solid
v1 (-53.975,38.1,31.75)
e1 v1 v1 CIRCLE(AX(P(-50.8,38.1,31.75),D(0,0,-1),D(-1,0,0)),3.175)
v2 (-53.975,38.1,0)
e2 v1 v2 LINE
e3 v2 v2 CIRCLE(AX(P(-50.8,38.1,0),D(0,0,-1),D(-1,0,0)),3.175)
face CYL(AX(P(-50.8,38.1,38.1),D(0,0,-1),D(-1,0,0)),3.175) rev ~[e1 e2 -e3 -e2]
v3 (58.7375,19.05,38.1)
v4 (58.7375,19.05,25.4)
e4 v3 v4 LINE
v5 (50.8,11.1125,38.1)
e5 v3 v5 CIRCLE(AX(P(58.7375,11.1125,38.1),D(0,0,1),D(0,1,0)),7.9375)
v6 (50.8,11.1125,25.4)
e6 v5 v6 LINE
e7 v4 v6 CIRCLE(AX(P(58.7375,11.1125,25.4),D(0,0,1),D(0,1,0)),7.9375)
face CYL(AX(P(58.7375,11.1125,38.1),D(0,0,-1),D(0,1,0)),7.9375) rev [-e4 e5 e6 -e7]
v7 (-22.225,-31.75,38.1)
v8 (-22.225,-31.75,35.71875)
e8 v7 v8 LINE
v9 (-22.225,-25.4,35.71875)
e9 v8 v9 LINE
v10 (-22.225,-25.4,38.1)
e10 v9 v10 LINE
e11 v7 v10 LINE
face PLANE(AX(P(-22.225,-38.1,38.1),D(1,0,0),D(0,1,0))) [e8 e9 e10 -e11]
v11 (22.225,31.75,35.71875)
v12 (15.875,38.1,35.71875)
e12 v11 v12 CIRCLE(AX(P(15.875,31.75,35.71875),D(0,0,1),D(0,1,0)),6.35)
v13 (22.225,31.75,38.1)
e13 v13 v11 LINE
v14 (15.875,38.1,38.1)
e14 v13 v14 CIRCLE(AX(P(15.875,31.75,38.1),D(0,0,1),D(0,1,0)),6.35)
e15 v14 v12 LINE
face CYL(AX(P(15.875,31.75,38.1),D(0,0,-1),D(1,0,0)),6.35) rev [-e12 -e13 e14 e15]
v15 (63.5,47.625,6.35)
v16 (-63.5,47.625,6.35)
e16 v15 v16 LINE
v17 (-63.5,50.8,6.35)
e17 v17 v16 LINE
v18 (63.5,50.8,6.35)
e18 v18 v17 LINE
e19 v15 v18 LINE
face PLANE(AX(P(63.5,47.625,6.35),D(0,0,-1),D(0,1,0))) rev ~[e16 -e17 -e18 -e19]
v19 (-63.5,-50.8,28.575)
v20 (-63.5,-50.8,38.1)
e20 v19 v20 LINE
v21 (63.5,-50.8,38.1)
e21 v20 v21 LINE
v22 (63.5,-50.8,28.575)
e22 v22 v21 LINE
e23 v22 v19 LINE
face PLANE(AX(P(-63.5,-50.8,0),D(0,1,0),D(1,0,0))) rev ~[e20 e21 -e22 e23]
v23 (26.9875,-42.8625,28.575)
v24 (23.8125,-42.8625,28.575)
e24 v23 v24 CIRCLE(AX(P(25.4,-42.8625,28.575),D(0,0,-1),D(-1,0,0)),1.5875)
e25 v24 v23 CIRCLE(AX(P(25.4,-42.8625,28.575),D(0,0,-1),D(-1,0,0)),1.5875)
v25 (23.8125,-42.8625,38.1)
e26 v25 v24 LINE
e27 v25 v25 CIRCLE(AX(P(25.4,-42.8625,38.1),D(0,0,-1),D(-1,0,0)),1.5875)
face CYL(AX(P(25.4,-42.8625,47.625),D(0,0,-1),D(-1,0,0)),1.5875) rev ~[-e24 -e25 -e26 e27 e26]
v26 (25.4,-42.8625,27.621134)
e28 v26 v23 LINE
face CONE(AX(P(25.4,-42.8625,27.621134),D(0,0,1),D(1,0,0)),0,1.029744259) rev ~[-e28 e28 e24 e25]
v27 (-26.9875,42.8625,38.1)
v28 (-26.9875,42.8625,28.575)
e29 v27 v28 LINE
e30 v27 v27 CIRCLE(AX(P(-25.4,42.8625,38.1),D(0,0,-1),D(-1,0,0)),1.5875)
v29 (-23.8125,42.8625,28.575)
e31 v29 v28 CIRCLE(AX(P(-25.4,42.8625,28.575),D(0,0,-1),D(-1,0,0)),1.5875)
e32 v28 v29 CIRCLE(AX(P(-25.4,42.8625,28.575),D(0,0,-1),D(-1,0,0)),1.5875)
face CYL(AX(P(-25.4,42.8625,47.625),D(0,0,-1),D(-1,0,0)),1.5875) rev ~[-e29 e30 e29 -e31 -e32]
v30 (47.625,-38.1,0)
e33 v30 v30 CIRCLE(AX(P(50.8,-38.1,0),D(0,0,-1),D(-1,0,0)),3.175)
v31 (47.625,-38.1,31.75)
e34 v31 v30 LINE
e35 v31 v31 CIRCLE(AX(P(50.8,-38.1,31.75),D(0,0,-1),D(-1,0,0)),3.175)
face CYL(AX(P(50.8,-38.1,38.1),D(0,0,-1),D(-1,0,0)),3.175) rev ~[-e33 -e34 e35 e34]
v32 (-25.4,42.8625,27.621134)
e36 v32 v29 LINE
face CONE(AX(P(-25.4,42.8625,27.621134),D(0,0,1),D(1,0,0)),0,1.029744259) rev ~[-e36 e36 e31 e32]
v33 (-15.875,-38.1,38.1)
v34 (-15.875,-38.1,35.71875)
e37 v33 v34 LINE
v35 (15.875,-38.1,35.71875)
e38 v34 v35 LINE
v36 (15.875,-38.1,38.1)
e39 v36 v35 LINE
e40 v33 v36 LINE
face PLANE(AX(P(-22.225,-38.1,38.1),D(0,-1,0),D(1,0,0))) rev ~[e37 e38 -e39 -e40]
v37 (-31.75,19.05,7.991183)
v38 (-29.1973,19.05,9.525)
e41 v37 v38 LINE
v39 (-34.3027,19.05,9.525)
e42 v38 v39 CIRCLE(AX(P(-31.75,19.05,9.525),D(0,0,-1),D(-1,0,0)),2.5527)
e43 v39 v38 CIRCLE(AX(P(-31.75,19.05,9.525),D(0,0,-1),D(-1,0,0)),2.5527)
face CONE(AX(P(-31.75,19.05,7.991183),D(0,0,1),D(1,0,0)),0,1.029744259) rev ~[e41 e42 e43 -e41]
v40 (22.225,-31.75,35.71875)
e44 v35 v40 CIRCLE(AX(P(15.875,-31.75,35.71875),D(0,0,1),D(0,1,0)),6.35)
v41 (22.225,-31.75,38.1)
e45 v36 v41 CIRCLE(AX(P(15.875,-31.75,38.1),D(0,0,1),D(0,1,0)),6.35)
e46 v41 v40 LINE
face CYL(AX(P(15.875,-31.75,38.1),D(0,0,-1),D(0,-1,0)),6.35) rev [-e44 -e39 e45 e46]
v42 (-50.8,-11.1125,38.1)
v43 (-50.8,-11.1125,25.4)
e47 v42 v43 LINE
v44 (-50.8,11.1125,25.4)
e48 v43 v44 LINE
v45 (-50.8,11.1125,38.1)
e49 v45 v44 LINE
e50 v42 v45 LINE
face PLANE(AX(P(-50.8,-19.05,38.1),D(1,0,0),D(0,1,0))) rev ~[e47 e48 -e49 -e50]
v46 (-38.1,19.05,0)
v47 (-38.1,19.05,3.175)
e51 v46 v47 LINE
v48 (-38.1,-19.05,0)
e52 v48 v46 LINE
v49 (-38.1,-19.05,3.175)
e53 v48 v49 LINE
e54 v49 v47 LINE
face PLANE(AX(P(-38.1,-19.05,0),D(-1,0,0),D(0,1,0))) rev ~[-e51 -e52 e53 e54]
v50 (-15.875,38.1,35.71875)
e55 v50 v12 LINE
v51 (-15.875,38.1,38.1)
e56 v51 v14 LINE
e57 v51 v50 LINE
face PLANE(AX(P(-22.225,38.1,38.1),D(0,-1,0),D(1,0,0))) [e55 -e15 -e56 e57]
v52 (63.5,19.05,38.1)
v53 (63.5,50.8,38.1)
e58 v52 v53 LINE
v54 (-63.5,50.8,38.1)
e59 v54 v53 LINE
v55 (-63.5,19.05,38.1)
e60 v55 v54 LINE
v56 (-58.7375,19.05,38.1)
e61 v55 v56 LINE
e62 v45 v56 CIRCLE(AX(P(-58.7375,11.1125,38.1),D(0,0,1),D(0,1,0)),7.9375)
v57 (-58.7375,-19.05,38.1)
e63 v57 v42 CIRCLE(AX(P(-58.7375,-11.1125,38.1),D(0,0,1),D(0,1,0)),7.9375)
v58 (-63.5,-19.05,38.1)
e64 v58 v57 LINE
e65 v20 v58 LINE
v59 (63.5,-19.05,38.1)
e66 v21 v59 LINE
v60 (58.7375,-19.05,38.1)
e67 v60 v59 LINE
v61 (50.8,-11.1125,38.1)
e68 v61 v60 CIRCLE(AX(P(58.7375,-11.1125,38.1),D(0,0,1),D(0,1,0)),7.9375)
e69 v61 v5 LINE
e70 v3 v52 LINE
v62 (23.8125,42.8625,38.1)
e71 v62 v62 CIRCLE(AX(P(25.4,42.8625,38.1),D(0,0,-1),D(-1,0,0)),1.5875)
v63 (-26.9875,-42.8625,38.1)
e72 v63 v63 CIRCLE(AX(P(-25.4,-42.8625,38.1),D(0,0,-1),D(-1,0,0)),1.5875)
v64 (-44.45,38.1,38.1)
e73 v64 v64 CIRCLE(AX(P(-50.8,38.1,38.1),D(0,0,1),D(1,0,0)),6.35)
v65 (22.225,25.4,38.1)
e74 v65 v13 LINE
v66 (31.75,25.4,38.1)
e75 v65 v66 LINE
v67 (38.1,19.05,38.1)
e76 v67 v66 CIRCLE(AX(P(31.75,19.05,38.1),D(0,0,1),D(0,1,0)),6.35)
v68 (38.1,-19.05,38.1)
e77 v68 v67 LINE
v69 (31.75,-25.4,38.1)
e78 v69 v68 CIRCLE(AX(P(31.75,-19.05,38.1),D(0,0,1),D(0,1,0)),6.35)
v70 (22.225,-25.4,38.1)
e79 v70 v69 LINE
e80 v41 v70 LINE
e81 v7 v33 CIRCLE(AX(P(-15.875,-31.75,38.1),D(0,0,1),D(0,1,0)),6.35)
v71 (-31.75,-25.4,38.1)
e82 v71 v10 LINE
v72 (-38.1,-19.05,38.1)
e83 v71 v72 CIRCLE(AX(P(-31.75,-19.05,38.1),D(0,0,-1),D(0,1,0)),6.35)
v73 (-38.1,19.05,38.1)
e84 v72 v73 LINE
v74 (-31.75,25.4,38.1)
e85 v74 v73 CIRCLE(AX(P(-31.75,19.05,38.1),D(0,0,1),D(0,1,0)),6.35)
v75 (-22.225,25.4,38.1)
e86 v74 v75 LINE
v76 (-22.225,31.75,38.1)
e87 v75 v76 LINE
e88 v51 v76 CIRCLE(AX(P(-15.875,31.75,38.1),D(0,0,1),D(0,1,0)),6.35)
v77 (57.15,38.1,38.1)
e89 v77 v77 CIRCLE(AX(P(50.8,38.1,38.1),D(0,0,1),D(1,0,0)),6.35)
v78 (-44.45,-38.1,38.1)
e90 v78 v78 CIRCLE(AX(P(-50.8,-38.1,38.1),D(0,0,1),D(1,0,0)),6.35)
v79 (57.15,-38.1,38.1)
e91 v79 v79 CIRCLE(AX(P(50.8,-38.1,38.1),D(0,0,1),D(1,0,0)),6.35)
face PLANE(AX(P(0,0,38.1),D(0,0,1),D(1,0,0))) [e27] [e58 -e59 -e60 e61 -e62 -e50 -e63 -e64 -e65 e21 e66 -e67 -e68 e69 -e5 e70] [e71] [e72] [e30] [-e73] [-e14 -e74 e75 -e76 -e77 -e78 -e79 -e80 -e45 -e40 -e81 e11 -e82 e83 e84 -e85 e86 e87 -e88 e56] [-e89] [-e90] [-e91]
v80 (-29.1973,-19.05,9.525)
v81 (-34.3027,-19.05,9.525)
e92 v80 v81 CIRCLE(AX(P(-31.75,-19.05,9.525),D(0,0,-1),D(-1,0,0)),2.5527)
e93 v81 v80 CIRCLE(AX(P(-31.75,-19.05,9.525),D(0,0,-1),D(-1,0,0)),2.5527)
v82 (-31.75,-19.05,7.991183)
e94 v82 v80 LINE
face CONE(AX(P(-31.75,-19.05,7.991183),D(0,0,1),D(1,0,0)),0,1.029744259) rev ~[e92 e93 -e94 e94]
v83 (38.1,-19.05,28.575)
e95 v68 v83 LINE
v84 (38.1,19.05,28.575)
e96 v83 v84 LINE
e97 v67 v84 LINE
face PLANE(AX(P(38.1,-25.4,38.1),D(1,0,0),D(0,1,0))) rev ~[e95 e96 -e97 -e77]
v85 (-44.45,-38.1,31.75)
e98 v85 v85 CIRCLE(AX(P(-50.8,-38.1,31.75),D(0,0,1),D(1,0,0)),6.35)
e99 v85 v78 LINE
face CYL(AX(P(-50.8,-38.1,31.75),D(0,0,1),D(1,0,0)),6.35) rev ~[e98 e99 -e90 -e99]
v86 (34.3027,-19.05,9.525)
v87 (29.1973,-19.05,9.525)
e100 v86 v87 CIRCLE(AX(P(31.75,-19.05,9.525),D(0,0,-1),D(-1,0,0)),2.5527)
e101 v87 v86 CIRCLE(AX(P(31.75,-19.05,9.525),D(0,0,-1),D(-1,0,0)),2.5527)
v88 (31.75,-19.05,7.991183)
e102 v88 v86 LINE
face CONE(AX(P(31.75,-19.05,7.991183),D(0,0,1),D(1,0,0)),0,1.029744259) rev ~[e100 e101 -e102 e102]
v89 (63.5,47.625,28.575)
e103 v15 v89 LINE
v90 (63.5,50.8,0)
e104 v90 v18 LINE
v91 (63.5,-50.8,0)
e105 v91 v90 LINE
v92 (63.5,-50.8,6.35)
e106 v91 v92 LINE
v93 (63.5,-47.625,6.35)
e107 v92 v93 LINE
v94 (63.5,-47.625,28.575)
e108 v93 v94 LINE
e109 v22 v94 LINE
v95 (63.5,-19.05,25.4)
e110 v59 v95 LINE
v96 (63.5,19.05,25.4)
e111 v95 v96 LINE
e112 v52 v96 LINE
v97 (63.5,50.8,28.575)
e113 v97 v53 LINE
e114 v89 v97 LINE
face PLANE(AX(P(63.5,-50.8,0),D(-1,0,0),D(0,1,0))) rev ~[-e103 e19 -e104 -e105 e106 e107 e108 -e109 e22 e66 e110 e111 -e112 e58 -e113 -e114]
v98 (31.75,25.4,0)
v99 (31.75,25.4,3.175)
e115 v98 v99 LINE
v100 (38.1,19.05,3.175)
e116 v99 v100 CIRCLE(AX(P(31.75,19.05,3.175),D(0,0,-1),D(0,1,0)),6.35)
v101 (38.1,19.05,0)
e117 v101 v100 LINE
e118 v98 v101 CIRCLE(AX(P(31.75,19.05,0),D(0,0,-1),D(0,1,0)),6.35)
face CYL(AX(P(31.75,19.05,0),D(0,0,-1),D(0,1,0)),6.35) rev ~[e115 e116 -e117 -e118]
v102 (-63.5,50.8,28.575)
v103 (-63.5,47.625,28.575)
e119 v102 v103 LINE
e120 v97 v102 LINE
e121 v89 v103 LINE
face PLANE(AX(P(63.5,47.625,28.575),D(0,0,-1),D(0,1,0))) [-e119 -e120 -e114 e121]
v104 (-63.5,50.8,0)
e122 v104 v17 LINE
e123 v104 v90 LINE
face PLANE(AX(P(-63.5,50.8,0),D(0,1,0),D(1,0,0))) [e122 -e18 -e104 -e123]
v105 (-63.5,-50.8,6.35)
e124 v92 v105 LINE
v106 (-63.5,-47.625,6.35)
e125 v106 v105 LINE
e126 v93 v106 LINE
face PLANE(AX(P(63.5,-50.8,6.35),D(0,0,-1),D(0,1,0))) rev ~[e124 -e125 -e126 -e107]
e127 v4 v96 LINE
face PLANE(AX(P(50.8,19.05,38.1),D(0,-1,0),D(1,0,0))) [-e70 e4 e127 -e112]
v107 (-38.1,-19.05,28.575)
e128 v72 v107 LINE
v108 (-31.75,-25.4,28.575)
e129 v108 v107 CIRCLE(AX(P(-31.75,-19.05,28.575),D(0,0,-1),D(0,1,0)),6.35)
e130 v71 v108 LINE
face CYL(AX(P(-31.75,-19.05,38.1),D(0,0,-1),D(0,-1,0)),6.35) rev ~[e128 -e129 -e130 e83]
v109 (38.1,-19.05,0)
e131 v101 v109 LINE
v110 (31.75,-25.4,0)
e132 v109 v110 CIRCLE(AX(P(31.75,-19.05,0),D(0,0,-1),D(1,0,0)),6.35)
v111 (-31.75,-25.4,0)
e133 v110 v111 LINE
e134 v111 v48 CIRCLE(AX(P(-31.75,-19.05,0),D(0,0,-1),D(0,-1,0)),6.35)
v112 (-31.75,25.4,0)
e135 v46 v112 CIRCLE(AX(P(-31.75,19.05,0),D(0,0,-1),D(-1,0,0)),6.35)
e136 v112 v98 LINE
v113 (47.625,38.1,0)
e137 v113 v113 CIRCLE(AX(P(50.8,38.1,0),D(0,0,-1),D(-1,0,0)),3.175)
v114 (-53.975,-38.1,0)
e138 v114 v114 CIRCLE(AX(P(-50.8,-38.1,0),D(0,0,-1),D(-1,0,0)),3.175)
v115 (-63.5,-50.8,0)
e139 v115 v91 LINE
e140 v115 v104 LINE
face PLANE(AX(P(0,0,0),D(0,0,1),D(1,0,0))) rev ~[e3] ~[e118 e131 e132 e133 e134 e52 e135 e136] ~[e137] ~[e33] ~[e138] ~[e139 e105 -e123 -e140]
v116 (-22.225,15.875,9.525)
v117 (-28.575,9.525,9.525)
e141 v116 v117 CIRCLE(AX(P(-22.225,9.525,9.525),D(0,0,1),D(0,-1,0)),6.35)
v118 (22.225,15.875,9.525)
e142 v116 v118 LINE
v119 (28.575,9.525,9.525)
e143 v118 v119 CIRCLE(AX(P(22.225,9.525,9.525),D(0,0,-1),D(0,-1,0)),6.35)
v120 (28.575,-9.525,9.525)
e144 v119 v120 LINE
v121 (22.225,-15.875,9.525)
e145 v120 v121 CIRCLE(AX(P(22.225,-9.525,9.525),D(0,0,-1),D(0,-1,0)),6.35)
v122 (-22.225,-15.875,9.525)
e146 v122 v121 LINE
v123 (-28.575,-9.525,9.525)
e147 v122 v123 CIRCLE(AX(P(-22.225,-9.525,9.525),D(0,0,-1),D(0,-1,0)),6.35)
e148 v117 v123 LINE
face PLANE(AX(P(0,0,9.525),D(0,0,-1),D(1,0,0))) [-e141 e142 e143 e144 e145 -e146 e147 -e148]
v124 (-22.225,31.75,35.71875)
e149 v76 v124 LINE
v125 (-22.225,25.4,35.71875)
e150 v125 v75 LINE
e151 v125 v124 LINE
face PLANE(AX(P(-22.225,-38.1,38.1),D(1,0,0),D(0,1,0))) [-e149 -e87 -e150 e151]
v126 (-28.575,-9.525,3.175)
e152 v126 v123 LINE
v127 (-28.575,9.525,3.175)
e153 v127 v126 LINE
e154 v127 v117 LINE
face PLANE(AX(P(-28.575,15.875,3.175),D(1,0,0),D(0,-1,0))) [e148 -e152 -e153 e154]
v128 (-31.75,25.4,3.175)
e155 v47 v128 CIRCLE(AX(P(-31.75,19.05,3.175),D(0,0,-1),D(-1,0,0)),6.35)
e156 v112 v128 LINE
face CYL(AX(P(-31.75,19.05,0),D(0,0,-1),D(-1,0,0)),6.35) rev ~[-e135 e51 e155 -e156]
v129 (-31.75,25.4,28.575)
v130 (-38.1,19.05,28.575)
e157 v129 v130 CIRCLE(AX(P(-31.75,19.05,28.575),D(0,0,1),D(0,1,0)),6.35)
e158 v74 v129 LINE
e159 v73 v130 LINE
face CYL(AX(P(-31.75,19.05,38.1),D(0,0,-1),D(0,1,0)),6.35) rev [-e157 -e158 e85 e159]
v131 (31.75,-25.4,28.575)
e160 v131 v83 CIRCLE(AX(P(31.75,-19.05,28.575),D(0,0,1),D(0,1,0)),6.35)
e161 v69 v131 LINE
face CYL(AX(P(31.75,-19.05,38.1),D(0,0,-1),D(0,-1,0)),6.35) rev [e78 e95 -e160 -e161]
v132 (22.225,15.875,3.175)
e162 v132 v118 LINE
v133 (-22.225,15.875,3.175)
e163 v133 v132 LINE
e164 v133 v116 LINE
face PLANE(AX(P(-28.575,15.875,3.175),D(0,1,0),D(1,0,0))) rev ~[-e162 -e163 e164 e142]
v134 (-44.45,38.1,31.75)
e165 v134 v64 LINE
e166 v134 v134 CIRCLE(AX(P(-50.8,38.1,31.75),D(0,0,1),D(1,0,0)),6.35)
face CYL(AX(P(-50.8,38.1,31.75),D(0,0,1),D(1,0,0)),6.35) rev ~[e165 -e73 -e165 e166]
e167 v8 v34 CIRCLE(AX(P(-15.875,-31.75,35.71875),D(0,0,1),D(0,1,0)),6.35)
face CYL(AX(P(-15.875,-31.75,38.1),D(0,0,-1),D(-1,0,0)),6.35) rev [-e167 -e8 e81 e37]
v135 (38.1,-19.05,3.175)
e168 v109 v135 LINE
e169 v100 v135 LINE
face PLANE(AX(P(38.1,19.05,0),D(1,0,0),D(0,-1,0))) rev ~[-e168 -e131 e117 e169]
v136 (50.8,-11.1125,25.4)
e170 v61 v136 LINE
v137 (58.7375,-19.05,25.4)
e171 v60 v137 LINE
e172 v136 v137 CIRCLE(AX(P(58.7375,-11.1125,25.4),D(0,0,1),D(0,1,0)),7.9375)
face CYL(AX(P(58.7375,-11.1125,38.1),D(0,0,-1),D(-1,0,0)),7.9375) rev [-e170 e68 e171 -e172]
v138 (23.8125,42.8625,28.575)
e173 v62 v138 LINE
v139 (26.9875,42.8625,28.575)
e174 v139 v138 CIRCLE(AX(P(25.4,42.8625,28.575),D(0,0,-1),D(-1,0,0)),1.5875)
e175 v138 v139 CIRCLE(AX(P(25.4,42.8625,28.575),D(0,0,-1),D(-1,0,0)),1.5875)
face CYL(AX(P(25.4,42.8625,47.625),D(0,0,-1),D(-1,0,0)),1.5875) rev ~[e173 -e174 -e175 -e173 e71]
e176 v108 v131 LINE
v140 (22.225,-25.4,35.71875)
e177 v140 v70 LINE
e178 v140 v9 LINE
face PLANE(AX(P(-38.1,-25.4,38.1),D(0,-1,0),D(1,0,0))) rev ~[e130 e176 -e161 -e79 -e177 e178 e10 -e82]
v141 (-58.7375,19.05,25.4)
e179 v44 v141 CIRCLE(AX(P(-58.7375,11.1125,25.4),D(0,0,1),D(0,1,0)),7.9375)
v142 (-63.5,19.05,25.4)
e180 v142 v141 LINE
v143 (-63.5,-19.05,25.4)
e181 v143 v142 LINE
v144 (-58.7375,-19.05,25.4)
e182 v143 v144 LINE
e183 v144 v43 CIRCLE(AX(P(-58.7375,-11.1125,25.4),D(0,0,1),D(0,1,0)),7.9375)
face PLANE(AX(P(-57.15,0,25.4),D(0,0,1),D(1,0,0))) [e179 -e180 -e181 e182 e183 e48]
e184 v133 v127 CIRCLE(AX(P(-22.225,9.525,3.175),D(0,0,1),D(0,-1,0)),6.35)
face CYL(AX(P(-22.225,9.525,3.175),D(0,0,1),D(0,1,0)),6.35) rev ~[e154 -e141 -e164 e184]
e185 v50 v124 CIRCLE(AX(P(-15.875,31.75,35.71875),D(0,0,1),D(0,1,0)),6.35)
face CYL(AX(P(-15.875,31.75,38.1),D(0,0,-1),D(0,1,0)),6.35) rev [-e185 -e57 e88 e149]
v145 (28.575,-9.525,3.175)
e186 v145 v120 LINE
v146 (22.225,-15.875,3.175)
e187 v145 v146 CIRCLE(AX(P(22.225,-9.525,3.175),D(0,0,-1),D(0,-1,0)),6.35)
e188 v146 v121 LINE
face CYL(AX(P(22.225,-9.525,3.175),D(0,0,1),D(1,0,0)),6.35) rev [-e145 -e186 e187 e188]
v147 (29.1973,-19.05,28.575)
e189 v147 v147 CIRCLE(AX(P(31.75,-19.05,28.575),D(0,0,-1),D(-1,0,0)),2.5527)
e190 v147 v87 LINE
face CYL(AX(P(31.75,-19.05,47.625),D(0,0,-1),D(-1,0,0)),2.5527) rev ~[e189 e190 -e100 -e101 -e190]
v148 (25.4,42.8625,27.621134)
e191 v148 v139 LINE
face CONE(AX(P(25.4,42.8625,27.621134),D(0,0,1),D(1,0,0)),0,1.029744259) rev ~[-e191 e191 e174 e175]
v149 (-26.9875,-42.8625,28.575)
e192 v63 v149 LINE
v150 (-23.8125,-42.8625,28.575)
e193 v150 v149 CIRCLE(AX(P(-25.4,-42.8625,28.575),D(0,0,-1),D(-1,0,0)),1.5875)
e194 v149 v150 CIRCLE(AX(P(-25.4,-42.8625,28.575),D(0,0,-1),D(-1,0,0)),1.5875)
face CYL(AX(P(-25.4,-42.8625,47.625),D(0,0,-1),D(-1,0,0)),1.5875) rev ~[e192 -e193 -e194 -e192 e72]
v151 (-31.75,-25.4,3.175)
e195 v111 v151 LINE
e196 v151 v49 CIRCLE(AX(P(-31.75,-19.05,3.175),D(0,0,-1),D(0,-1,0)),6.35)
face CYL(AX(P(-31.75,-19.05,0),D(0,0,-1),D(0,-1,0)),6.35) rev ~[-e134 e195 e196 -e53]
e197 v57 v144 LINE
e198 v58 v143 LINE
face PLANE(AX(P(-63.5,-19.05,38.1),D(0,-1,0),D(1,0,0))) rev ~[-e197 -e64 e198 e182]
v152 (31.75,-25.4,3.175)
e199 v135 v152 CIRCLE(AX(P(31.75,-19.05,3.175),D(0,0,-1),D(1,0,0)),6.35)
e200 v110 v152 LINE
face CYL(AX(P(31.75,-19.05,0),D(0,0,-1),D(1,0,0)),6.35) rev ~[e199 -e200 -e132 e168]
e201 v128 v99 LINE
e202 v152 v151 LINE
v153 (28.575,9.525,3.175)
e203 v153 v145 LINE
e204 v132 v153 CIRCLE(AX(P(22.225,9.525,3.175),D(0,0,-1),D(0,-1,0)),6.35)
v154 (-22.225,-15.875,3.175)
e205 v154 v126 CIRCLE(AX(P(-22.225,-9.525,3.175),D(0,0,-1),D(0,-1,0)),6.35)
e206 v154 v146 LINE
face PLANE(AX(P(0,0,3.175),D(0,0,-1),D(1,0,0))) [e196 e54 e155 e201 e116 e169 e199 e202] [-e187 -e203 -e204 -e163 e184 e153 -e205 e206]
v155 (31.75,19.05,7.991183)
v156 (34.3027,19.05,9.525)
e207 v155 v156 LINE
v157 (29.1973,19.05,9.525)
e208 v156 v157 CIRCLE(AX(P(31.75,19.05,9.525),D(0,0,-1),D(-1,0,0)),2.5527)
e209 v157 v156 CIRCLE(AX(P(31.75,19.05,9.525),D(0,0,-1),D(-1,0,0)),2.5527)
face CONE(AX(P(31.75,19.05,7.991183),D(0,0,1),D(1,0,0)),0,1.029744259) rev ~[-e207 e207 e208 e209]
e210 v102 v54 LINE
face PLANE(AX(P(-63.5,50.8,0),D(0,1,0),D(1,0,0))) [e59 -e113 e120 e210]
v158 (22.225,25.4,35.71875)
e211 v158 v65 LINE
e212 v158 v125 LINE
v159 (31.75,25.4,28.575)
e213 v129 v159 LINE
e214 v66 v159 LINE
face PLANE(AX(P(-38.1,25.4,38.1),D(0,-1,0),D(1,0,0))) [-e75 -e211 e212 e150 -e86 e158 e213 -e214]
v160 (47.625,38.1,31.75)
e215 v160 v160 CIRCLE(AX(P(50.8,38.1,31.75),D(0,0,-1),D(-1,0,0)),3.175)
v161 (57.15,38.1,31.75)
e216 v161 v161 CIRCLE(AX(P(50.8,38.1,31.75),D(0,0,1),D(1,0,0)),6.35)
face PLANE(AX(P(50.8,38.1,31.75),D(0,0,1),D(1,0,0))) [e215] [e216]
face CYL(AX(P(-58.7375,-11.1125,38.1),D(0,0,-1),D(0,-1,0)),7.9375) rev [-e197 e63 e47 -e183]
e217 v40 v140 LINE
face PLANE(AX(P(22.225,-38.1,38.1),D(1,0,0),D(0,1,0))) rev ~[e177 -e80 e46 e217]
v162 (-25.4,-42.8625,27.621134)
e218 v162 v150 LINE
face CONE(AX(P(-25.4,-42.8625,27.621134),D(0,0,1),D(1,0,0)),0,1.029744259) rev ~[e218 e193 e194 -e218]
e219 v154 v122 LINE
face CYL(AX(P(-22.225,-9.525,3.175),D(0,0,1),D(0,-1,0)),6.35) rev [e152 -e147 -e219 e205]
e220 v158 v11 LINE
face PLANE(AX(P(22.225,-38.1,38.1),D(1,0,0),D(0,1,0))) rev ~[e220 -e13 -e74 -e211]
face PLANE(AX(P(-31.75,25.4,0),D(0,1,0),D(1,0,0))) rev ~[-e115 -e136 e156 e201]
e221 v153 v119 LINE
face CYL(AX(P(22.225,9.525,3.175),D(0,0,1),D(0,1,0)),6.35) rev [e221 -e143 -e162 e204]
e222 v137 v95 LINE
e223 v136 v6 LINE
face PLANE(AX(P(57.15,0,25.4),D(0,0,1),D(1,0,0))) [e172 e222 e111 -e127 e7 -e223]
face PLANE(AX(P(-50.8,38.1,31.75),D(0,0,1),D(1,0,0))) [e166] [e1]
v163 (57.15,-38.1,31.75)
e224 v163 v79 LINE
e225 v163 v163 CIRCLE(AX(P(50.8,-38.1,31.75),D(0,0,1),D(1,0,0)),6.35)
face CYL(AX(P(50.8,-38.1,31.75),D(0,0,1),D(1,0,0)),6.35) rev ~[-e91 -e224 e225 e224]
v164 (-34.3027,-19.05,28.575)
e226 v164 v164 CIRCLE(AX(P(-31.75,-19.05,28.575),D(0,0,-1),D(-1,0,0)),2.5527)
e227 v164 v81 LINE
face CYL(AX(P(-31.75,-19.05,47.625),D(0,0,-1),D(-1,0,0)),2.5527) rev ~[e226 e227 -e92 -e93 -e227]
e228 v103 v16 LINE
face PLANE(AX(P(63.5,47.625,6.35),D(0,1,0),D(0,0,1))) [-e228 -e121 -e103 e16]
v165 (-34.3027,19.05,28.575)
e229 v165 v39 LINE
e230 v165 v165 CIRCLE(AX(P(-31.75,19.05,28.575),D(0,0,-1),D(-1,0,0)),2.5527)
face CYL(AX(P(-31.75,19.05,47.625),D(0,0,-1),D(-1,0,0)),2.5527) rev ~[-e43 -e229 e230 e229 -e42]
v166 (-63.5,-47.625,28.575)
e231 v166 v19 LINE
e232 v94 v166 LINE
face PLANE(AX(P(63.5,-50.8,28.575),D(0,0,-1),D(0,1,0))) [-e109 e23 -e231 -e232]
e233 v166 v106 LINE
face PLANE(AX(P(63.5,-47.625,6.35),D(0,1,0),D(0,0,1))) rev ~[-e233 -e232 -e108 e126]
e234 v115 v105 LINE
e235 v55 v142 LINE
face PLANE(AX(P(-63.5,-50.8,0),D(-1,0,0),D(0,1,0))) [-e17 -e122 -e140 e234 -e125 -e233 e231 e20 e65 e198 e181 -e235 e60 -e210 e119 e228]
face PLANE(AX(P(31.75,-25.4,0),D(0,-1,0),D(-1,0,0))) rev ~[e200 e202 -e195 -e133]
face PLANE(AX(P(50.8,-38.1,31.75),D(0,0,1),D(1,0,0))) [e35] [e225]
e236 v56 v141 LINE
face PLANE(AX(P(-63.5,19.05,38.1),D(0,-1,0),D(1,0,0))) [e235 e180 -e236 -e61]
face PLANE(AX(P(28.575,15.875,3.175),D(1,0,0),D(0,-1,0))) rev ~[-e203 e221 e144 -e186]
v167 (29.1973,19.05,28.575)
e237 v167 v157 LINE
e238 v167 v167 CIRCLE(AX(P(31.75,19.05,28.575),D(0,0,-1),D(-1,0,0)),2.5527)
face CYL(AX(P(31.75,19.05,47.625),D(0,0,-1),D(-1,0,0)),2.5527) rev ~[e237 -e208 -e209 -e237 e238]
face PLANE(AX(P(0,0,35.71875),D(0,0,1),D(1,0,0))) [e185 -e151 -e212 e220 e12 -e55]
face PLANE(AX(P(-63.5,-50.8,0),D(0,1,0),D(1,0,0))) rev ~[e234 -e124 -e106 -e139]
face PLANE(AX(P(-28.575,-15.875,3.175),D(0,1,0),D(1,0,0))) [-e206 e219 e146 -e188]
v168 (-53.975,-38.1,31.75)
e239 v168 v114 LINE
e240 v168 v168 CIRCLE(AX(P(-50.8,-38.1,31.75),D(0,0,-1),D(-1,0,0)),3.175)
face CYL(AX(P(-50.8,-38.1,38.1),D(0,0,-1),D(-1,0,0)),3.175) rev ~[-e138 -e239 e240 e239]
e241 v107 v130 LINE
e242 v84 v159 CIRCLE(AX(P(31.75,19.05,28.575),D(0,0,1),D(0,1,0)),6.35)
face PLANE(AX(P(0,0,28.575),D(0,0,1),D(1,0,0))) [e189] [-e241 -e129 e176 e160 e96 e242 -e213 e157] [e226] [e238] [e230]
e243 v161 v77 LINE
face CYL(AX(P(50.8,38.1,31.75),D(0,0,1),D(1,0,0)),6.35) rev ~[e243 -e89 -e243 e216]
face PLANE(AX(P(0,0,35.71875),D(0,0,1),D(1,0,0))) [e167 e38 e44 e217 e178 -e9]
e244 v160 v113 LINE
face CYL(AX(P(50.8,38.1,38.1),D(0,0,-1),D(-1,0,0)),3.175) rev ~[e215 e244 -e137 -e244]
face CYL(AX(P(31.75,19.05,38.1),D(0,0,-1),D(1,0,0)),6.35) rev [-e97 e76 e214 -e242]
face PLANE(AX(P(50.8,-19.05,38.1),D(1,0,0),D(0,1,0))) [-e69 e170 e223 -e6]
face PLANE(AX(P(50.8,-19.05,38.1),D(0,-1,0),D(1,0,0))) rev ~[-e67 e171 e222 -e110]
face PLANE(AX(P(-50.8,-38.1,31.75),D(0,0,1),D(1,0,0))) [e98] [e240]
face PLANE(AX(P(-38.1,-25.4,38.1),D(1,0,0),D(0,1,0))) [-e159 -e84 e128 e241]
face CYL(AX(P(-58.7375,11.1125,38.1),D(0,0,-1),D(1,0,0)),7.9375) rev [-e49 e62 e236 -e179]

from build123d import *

# Parameters (mm, degrees)
F0_W           = 127
F0_H           = 101.6
F1_DEPTH       = 38.1
F2_W           = 76.2
F2_H           = 50.8
F3_DEPTH       = 9.525
F4_R           = 6.35
F6_D           = 6.35
F6_CBORE_D     = 12.7
F6_CBORE_DEPTH = 6.35
F7_W           = 3.175
F7_H           = 22.225
F8_DEPTH       = 127.001
F10_D          = 5.1054
F10_DEPTH      = 19.05
F10_TIP        = 1.5338169022
F11_W          = 12.7
F11_H          = 38.1
F12_DEPTH      = 12.7
F13_R          = 7.9375
F15_DEPTH      = 3.175
F16_W          = 57.15
F16_H          = 31.75
F17_DEPTH      = 6.35
F18_R          = 6.35
F20_D          = 3.175
F20_DEPTH      = 9.525
F20_TIP        = 0.9538662327
F21_W          = 44.45
F21_H          = 76.2
F22_DEPTH      = 2.38125
F23_R          = 6.35


# Not quite as in the source:
# - a feature of the source that left no trace in its solid (it failed there, or was rolled back) is left out


with BuildPart() as f1:
    # F0 (on Top) → F1 (new body)
    with BuildSketch(Plane.XY):
        Rectangle(F0_W, F0_H)
    extrude(amount=F1_DEPTH)

    # F2 (on face) → F3 (cut)
    with BuildSketch(Plane.XY.offset(38.1)):
        Rectangle(F2_W, F2_H)
    extrude(amount=-F3_DEPTH, mode=Mode.SUBTRACT)

    # F4
    f4_edges = [f1.edges().sort_by_distance(p)[0] for p in [
        (-38.1, 25.4, 33.3375),
        (38.1, 25.4, 33.3375),
        (38.1, -25.4, 33.3375),
        (-38.1, -25.4, 33.3375),
    ]]
    fillet(f4_edges, radius=F4_R)

    # F6 (through all)
    with Locations(Plane.XY.offset(38.1)):
        with Locations((-50.8, 38.1), (50.8, 38.1), (50.8, -38.1), (-50.8, -38.1)):
            CounterBoreHole(F6_D / 2, F6_CBORE_D / 2, F6_CBORE_DEPTH)

    # F7 (on face) → F8 (cut, through all)
    with BuildSketch(Plane.YZ.offset(63.5)):
        with Locations((-49.2125, 17.4625)):
            Rectangle(F7_W, F7_H)
        with Locations((49.2125, 17.4625)):
            Rectangle(F7_W, F7_H)
    extrude(amount=-F8_DEPTH, mode=Mode.SUBTRACT)

    # F10
    with Locations(Plane.XY.offset(28.575)):
        with Locations((-31.75, 19.05), (-31.75, -19.05), (31.75, -19.05), (31.75, 19.05)):
            Hole(F10_D / 2, depth=F10_DEPTH)
            with Locations((0, 0, -(F10_DEPTH + F10_TIP / 2))):  # 118° drill point
                Cone(0, F10_D / 2, F10_TIP, mode=Mode.SUBTRACT)

    # F11 (on face) → F12 (cut)
    with BuildSketch(Plane.XY.offset(38.1)):
        with Locations((-57.15, 0)):
            Rectangle(F11_W, F11_H)
        with Locations((57.15, 0)):
            Rectangle(F11_W, F11_H)
    extrude(amount=-F12_DEPTH, mode=Mode.SUBTRACT)

    # F13
    f13_edges = [f1.edges().sort_by_distance(p)[0] for p in [
        (-50.8, 19.05, 31.75),
        (-50.8, -19.05, 31.75),
        (50.8, 19.05, 31.75),
        (50.8, -19.05, 31.75),
    ]]
    fillet(f13_edges, radius=F13_R)

    # F14 (on face) → F15 (cut)
    with BuildSketch(Plane(origin=(0, 0, 0), x_dir=(1, 0, 0), z_dir=(0, 0, -1))):
        with BuildLine():
            Line((-31.75, -25.4), (31.75, -25.4))
            ThreePointArc((31.75, -25.4), (36.2401280605, -23.5401280605), (38.1, -19.05))
            Line((38.1, -19.05), (38.1, 19.05))
            ThreePointArc((38.1, 19.05), (36.2401280605, 23.5401280605), (31.75, 25.4))
            Line((31.75, 25.4), (-31.75, 25.4))
            ThreePointArc((-31.75, 25.4), (-36.2401280605, 23.5401280605), (-38.1, 19.05))
            Line((-38.1, 19.05), (-38.1, -19.05))
            ThreePointArc((-38.1, -19.05), (-36.2401280605, -23.5401280605), (-31.75, -25.4))
        make_face()
    extrude(amount=-F15_DEPTH, mode=Mode.SUBTRACT)

    # F16 (on face) → F17 (cut)
    with BuildSketch(Plane(origin=(0, 0, 3.175), x_dir=(1, 0, 0), z_dir=(0, 0, -1))):
        Rectangle(F16_W, F16_H)
    extrude(amount=-F17_DEPTH, mode=Mode.SUBTRACT)

    # F18
    f18_edges = [f1.edges().sort_by_distance(p)[0] for p in [
        (-28.575, -15.875, 6.35),
        (-28.575, 15.875, 6.35),
        (28.575, -15.875, 6.35),
        (28.575, 15.875, 6.35),
    ]]
    fillet(f18_edges, radius=F18_R)

    # F20
    with Locations(Plane.XY.offset(38.1)):
        with Locations((-25.4, 42.8625), (25.4, 42.8625), (-25.4, -42.8625), (25.4, -42.8625)):
            Hole(F20_D / 2, depth=F20_DEPTH)
            with Locations((0, 0, -(F20_DEPTH + F20_TIP / 2))):  # 118° drill point
                Cone(0, F20_D / 2, F20_TIP, mode=Mode.SUBTRACT)

    # F21 (on face) → F22 (cut)
    with BuildSketch(Plane.XY.offset(38.1)):
        Rectangle(F21_W, F21_H)
    extrude(amount=-F22_DEPTH, mode=Mode.SUBTRACT)

    # F23
    f23_edges = [f1.edges().sort_by_distance(p)[0] for p in [
        (-22.225, 38.1, 36.909375),
        (22.225, 38.1, 36.909375),
        (22.225, -38.1, 36.909375),
        (-22.225, -38.1, 36.909375),
    ]]
    fillet(f23_edges, radius=F23_R)


solid = f1.part
